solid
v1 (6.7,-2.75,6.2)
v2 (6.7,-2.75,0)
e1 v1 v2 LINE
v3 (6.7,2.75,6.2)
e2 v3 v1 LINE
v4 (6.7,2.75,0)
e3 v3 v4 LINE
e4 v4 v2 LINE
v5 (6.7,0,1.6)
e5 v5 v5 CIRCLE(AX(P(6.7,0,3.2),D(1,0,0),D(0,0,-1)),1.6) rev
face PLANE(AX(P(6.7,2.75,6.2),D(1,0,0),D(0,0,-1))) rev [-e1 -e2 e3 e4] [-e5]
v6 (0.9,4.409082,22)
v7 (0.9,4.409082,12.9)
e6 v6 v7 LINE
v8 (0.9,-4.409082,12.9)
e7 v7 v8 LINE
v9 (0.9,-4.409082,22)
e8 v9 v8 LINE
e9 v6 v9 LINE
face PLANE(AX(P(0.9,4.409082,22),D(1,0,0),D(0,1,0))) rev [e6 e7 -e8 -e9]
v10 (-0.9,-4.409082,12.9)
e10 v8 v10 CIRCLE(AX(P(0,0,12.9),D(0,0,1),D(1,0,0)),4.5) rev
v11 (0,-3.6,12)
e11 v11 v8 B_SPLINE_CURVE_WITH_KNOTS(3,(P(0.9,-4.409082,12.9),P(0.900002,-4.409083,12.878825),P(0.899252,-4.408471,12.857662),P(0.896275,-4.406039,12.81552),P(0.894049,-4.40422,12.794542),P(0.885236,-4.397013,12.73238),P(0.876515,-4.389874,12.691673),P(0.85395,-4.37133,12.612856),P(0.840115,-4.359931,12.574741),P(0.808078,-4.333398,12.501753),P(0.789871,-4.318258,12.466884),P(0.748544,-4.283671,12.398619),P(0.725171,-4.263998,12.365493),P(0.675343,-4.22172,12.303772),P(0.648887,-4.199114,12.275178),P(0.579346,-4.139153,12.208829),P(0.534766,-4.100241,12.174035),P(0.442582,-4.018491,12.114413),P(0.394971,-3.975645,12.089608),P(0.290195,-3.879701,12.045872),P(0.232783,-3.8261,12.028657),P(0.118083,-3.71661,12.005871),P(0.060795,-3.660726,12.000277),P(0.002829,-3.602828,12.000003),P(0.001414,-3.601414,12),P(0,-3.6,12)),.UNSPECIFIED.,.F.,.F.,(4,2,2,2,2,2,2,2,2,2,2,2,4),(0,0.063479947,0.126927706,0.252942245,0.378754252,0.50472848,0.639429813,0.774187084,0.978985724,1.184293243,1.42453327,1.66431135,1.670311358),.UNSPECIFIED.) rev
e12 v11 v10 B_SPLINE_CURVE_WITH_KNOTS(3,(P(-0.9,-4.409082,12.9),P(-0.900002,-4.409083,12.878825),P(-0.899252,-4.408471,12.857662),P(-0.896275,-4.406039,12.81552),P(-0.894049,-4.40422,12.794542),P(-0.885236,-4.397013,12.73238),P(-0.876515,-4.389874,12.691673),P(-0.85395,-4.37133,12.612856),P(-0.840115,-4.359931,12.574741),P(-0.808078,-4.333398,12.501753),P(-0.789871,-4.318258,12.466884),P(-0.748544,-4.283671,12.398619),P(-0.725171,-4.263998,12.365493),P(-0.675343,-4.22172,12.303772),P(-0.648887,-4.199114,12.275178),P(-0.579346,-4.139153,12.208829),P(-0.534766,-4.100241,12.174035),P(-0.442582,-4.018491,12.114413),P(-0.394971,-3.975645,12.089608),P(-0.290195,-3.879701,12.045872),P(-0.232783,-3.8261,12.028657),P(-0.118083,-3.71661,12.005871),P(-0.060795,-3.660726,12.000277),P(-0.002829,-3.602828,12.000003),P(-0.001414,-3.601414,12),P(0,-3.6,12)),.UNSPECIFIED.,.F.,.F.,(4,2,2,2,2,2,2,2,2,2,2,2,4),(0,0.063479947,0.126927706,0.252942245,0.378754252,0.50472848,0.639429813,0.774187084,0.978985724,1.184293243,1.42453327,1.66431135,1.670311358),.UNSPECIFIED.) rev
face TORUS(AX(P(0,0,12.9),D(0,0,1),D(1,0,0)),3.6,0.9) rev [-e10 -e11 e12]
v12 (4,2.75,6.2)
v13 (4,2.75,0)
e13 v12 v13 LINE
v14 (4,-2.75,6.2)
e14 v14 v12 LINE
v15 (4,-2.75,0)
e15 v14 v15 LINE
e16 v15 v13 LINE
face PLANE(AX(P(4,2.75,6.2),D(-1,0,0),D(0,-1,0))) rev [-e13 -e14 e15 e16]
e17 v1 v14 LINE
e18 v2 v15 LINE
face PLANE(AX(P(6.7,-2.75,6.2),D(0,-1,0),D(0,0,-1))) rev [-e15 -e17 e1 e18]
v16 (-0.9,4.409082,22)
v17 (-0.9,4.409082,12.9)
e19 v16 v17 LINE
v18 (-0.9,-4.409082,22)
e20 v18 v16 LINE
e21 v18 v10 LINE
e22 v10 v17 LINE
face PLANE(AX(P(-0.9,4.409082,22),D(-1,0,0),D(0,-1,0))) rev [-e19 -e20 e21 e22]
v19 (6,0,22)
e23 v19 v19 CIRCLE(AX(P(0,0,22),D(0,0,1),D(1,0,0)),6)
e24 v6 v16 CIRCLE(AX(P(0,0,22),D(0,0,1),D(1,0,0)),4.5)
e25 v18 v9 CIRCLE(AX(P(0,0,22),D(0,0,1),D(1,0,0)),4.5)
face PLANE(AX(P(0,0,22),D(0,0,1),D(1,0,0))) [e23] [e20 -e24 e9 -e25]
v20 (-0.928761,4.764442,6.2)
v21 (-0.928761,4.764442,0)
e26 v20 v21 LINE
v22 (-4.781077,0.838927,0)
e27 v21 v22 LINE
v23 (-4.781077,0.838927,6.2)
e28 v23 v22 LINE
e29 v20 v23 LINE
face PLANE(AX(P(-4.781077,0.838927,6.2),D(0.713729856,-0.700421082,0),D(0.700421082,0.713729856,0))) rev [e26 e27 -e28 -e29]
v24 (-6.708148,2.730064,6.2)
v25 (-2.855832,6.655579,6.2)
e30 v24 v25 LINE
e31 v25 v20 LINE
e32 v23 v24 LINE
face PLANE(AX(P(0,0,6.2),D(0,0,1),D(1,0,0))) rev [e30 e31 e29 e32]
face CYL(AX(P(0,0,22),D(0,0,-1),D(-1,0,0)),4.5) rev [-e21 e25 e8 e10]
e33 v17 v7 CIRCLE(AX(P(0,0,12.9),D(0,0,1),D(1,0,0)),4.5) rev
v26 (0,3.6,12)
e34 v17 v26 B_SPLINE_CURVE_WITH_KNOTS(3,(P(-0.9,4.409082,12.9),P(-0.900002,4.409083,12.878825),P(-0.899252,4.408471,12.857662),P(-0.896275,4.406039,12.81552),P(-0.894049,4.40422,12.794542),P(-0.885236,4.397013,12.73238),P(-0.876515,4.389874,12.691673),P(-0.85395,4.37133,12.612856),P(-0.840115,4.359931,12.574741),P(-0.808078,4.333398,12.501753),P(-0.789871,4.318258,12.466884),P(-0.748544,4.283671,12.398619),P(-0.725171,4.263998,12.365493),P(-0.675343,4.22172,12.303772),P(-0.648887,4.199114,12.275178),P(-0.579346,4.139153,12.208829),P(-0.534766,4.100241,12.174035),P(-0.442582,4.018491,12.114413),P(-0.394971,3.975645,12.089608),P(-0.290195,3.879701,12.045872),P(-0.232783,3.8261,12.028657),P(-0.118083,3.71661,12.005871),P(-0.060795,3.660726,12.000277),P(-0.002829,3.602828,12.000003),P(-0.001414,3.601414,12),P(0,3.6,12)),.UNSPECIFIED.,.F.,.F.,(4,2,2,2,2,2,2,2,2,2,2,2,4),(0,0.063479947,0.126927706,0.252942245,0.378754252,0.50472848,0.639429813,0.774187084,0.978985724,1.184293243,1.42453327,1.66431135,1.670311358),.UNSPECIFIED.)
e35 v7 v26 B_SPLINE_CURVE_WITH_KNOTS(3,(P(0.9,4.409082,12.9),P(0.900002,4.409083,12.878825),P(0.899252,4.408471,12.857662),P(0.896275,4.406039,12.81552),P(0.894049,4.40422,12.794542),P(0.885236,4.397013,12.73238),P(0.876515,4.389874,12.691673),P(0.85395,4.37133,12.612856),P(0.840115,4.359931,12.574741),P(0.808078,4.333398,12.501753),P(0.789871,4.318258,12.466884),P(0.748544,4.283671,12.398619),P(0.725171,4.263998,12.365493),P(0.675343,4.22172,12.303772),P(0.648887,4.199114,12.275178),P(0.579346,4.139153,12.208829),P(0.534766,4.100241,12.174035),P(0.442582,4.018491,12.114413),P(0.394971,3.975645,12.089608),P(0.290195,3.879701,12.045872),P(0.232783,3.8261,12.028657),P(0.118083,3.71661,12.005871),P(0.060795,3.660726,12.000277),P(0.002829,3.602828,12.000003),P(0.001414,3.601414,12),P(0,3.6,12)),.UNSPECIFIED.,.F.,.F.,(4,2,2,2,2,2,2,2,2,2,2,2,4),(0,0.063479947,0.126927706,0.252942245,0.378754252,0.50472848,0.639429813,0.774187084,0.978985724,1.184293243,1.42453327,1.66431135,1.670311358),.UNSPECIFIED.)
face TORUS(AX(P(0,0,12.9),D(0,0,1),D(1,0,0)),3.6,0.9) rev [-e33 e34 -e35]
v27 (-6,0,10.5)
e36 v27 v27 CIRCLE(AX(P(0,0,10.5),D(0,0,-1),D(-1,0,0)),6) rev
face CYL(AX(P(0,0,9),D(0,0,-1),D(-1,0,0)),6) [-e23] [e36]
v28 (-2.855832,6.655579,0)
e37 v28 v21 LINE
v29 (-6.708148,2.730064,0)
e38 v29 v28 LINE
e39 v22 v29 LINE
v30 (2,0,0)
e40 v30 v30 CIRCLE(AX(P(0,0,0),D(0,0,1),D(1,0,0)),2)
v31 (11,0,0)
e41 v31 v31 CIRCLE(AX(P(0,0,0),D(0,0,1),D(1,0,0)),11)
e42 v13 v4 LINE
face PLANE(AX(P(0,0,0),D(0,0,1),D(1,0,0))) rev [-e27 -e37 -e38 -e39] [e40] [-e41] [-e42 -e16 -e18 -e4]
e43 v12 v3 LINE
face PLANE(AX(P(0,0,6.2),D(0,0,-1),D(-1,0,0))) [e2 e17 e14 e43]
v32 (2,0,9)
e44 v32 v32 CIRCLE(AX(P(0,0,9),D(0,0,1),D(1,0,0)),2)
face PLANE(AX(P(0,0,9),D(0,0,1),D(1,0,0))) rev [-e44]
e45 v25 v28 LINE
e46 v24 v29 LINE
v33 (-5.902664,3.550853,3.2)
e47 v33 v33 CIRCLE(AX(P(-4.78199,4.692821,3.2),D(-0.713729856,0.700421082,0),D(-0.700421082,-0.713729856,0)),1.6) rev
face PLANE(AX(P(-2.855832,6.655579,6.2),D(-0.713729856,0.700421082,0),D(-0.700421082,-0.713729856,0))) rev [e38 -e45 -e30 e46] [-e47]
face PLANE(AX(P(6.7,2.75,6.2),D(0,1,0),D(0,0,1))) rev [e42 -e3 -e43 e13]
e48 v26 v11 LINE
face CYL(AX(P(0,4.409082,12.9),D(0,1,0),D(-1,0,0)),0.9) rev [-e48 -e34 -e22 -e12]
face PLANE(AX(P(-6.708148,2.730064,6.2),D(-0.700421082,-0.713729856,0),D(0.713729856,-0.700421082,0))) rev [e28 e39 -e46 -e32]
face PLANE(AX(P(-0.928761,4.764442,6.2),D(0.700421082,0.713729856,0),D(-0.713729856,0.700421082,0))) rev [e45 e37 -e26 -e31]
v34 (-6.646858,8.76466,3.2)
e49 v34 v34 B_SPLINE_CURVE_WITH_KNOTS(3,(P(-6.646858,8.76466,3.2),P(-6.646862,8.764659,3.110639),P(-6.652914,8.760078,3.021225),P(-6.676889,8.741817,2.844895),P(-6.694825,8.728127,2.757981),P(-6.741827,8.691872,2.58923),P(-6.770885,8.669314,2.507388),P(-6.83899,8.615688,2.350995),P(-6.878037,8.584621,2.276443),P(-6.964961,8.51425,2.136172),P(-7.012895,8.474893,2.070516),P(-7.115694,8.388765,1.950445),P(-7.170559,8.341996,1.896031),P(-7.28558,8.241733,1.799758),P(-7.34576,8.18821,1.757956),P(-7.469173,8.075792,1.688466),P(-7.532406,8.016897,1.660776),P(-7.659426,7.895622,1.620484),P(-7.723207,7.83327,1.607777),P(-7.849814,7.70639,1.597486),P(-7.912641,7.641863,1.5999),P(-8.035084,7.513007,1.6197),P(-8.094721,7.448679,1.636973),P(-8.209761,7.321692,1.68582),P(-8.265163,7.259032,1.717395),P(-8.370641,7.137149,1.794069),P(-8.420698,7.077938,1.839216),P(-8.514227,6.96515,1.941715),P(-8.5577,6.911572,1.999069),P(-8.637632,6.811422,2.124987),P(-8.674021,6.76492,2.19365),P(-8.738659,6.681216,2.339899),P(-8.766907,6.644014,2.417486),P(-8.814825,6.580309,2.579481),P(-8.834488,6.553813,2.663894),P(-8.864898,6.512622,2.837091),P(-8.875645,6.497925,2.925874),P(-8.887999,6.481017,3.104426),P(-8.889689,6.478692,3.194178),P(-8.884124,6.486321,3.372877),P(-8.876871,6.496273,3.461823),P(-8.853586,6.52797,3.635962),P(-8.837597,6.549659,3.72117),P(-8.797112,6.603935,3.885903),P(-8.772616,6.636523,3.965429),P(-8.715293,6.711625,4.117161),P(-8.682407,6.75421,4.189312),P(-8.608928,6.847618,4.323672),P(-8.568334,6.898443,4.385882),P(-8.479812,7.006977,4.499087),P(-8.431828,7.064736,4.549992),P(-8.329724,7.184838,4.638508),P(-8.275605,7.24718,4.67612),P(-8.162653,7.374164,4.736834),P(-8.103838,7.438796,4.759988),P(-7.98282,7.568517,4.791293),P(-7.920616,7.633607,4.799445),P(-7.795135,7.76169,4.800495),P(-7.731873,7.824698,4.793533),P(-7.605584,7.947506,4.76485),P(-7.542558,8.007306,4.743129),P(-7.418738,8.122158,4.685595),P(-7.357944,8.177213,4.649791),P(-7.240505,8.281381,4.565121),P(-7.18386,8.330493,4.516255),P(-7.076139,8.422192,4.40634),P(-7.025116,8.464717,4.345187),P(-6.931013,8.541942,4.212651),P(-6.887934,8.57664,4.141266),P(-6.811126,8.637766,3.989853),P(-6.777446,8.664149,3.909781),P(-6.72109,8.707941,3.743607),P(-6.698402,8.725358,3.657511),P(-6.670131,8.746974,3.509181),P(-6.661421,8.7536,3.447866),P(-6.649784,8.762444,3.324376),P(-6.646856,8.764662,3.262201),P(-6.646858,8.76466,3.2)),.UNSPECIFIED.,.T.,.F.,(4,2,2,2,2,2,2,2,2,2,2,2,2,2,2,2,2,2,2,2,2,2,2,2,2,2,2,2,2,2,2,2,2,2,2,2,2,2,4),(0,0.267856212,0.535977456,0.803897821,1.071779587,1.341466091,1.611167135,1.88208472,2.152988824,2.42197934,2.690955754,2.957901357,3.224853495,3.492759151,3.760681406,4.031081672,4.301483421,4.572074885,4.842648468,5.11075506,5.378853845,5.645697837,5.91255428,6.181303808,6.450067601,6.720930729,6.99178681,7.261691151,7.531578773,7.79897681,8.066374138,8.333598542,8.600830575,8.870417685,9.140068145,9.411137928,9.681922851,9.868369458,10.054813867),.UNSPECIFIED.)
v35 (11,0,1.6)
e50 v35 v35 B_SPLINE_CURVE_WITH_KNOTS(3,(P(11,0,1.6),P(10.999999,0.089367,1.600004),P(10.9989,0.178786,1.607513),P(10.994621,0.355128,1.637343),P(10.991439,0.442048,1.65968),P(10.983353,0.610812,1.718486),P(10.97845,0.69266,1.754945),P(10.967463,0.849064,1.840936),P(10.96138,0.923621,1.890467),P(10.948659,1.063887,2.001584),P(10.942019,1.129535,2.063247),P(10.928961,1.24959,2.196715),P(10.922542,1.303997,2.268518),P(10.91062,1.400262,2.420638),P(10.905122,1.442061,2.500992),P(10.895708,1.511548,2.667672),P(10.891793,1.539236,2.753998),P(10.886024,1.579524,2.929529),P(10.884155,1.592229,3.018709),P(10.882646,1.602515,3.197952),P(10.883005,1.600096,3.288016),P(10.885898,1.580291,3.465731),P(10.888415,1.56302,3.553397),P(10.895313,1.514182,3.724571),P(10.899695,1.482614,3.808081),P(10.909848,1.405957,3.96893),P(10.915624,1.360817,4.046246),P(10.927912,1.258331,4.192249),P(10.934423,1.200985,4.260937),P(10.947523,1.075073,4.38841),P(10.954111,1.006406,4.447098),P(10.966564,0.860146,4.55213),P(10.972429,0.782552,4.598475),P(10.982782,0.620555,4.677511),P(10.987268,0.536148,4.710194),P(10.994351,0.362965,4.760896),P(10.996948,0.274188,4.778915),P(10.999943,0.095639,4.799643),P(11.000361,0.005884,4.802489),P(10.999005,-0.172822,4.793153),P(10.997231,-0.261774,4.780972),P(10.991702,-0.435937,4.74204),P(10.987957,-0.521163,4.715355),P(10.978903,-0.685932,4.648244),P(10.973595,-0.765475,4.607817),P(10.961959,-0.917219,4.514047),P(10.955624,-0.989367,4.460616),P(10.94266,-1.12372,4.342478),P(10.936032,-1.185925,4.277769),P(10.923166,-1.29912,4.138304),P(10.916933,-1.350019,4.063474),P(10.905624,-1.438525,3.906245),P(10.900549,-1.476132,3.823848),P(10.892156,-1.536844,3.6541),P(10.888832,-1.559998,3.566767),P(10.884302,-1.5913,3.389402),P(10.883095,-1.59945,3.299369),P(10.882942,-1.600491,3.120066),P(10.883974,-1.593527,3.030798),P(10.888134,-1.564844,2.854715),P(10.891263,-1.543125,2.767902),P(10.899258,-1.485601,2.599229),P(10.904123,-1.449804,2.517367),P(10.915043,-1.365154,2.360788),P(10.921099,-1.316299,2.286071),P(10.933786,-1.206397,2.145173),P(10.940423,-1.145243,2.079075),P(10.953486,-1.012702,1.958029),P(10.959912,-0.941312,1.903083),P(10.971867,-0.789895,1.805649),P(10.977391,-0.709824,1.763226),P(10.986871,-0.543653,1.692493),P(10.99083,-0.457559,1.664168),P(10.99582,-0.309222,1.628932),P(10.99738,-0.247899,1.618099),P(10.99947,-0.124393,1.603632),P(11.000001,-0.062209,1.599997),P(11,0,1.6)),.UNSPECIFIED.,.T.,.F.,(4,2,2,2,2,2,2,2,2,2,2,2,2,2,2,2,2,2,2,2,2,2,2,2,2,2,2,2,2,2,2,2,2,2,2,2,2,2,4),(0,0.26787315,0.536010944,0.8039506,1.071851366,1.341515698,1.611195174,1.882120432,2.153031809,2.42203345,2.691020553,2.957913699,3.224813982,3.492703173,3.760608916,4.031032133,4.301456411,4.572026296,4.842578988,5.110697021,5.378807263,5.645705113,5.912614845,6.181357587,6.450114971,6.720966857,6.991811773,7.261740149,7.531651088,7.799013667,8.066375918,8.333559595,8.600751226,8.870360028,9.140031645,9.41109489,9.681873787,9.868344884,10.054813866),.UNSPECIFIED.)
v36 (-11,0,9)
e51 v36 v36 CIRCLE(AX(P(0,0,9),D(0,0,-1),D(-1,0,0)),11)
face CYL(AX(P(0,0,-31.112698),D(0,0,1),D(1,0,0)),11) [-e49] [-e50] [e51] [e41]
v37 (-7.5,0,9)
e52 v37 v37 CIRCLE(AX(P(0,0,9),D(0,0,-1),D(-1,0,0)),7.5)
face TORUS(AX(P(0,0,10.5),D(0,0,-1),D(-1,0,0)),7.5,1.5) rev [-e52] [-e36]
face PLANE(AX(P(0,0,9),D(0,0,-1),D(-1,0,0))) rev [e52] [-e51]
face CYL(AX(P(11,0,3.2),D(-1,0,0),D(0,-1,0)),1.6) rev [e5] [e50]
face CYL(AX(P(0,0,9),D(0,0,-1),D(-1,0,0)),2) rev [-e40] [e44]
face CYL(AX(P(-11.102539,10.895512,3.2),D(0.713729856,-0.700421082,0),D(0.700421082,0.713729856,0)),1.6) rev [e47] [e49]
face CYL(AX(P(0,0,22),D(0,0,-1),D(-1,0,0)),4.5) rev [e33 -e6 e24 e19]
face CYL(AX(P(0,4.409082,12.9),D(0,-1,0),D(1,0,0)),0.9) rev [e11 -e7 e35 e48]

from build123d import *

# Parameters (mm, degrees)
SKETCH1_R           = 6
SKETCH1_R_2         = 2
BOSS_EXTRUDE1_DEPTH = 9
SKETCH2_R           = 6
BOSS_EXTRUDE2_DEPTH = 3
BOSS_EXTRUDE3_DEPTH = 10
SKETCH4_R           = 6
SKETCH4_R_2         = 4.5
BOSS_EXTRUDE4_DEPTH = 10
BOSS_EXTRUDE5_START = 9
SKETCH5_R           = 11
SKETCH5_R_2         = 6
BOSS_EXTRUDE5_DEPTH = 9
SKETCH6_W           = 2.7
SKETCH6_H           = 5.5
CUT_EXTRUDE1_DEPTH  = 6.2
SKETCH7_R           = 1.6
CUT_EXTRUDE2_DEPTH  = 29.809720582
SKETCH8_R           = 1.6
CUT_EXTRUDE3_DEPTH  = 30.43544272
FILLET1_R           = 0.9
FILLET2_R           = 1.5


with BuildPart() as part:
    # Sketch1 → Boss-Extrude1 (new body)
    with BuildSketch(Plane.XY):
        Circle(SKETCH1_R)
        Circle(SKETCH1_R_2, mode=Mode.SUBTRACT)
    extrude(amount=BOSS_EXTRUDE1_DEPTH)

    # Sketch2 → Boss-Extrude2 (add)
    with BuildSketch(Plane.XY.offset(9)):
        Circle(SKETCH2_R)
    extrude(amount=BOSS_EXTRUDE2_DEPTH)

    # Sketch3 → Boss-Extrude3 (add)
    with BuildSketch(Plane.XY.offset(12)):
        with BuildLine():
            Line((0.9, 4.409081537), (0.9, -4.409081537))
            ThreePointArc((0.9, -4.409081537), (4.5, 0), (0.9, 4.409081537))
        make_face()
        with BuildLine():
            Line((-0.9, 4.409081537), (-0.9, -4.409081537))
            ThreePointArc((-0.9, -4.409081537), (-4.5, 0), (-0.9, 4.409081537))
        make_face()
    extrude(amount=BOSS_EXTRUDE3_DEPTH)

    # Sketch4 → Boss-Extrude4 (add)
    with BuildSketch(Plane.XY.offset(12)):
        Circle(SKETCH4_R)
        Circle(SKETCH4_R_2, mode=Mode.SUBTRACT)
    extrude(amount=BOSS_EXTRUDE4_DEPTH)

    # Sketch5 → Boss-Extrude5 (add)
    with BuildSketch(Plane(origin=(0, 0, 9), x_dir=(-1, 0, 0), z_dir=(0, 0, -1)).offset(BOSS_EXTRUDE5_START)):
        with Locations(Location((0, 0, 0), (0, 0, 180))):
            Circle(SKETCH5_R)
        Circle(SKETCH5_R_2, mode=Mode.SUBTRACT)
    extrude(amount=-BOSS_EXTRUDE5_DEPTH)

    # Sketch6 → Cut-Extrude1 (cut)
    with BuildSketch(Plane(origin=(0, 0, 0), x_dir=(-1, 0, 0), z_dir=(0, 0, -1))):
        with Locations((-5.35, 0)):
            Rectangle(SKETCH6_W, SKETCH6_H)
        Polygon((2.855831889, 6.655578529), (6.708147842, 2.730064321), (4.781077231, 0.838927398), (0.928761278, 4.764441606), align=None)
    extrude(amount=-CUT_EXTRUDE1_DEPTH, mode=Mode.SUBTRACT)

    # Sketch7 → Cut-Extrude2 (cut, through all)
    with BuildSketch(Plane(origin=(4, 0, 0), x_dir=(0, 0, -1), z_dir=(1, 0, 0))):
        with Locations((-3.2, 0)):
            Circle(SKETCH7_R)
    extrude(amount=CUT_EXTRUDE2_DEPTH, mode=Mode.SUBTRACT)

    # Sketch8 → Cut-Extrude3 (cut, through all)
    with BuildSketch(Plane(origin=(-2.854919424, 2.80168433, 0), x_dir=(0, 0, 1), z_dir=(-0.7137298559492212, 0.7004210824402017, 0))):
        with Locations(Location((3.2, 0, 0), (0, 0, 90))):
            Circle(SKETCH8_R)
    extrude(amount=CUT_EXTRUDE3_DEPTH, mode=Mode.SUBTRACT)

    # Fillet1
    fillet1_edges = [part.edges().sort_by_distance(p)[0] for p in [
        (0.9, 0, 12),
        (-0.9, 0, 12),
        (0, 4.5, 12),
        (0, -4.5, 12),
    ]]
    fillet(fillet1_edges, radius=FILLET1_R - 0.0001)  # a hair under: the kernel refuses the full size

    # Fillet2
    fillet2_edges = [part.edges().sort_by_distance(p)[0] for p in [
        (-6, 0, 9),
    ]]
    fillet(fillet2_edges, radius=FILLET2_R)


solid = part.part
